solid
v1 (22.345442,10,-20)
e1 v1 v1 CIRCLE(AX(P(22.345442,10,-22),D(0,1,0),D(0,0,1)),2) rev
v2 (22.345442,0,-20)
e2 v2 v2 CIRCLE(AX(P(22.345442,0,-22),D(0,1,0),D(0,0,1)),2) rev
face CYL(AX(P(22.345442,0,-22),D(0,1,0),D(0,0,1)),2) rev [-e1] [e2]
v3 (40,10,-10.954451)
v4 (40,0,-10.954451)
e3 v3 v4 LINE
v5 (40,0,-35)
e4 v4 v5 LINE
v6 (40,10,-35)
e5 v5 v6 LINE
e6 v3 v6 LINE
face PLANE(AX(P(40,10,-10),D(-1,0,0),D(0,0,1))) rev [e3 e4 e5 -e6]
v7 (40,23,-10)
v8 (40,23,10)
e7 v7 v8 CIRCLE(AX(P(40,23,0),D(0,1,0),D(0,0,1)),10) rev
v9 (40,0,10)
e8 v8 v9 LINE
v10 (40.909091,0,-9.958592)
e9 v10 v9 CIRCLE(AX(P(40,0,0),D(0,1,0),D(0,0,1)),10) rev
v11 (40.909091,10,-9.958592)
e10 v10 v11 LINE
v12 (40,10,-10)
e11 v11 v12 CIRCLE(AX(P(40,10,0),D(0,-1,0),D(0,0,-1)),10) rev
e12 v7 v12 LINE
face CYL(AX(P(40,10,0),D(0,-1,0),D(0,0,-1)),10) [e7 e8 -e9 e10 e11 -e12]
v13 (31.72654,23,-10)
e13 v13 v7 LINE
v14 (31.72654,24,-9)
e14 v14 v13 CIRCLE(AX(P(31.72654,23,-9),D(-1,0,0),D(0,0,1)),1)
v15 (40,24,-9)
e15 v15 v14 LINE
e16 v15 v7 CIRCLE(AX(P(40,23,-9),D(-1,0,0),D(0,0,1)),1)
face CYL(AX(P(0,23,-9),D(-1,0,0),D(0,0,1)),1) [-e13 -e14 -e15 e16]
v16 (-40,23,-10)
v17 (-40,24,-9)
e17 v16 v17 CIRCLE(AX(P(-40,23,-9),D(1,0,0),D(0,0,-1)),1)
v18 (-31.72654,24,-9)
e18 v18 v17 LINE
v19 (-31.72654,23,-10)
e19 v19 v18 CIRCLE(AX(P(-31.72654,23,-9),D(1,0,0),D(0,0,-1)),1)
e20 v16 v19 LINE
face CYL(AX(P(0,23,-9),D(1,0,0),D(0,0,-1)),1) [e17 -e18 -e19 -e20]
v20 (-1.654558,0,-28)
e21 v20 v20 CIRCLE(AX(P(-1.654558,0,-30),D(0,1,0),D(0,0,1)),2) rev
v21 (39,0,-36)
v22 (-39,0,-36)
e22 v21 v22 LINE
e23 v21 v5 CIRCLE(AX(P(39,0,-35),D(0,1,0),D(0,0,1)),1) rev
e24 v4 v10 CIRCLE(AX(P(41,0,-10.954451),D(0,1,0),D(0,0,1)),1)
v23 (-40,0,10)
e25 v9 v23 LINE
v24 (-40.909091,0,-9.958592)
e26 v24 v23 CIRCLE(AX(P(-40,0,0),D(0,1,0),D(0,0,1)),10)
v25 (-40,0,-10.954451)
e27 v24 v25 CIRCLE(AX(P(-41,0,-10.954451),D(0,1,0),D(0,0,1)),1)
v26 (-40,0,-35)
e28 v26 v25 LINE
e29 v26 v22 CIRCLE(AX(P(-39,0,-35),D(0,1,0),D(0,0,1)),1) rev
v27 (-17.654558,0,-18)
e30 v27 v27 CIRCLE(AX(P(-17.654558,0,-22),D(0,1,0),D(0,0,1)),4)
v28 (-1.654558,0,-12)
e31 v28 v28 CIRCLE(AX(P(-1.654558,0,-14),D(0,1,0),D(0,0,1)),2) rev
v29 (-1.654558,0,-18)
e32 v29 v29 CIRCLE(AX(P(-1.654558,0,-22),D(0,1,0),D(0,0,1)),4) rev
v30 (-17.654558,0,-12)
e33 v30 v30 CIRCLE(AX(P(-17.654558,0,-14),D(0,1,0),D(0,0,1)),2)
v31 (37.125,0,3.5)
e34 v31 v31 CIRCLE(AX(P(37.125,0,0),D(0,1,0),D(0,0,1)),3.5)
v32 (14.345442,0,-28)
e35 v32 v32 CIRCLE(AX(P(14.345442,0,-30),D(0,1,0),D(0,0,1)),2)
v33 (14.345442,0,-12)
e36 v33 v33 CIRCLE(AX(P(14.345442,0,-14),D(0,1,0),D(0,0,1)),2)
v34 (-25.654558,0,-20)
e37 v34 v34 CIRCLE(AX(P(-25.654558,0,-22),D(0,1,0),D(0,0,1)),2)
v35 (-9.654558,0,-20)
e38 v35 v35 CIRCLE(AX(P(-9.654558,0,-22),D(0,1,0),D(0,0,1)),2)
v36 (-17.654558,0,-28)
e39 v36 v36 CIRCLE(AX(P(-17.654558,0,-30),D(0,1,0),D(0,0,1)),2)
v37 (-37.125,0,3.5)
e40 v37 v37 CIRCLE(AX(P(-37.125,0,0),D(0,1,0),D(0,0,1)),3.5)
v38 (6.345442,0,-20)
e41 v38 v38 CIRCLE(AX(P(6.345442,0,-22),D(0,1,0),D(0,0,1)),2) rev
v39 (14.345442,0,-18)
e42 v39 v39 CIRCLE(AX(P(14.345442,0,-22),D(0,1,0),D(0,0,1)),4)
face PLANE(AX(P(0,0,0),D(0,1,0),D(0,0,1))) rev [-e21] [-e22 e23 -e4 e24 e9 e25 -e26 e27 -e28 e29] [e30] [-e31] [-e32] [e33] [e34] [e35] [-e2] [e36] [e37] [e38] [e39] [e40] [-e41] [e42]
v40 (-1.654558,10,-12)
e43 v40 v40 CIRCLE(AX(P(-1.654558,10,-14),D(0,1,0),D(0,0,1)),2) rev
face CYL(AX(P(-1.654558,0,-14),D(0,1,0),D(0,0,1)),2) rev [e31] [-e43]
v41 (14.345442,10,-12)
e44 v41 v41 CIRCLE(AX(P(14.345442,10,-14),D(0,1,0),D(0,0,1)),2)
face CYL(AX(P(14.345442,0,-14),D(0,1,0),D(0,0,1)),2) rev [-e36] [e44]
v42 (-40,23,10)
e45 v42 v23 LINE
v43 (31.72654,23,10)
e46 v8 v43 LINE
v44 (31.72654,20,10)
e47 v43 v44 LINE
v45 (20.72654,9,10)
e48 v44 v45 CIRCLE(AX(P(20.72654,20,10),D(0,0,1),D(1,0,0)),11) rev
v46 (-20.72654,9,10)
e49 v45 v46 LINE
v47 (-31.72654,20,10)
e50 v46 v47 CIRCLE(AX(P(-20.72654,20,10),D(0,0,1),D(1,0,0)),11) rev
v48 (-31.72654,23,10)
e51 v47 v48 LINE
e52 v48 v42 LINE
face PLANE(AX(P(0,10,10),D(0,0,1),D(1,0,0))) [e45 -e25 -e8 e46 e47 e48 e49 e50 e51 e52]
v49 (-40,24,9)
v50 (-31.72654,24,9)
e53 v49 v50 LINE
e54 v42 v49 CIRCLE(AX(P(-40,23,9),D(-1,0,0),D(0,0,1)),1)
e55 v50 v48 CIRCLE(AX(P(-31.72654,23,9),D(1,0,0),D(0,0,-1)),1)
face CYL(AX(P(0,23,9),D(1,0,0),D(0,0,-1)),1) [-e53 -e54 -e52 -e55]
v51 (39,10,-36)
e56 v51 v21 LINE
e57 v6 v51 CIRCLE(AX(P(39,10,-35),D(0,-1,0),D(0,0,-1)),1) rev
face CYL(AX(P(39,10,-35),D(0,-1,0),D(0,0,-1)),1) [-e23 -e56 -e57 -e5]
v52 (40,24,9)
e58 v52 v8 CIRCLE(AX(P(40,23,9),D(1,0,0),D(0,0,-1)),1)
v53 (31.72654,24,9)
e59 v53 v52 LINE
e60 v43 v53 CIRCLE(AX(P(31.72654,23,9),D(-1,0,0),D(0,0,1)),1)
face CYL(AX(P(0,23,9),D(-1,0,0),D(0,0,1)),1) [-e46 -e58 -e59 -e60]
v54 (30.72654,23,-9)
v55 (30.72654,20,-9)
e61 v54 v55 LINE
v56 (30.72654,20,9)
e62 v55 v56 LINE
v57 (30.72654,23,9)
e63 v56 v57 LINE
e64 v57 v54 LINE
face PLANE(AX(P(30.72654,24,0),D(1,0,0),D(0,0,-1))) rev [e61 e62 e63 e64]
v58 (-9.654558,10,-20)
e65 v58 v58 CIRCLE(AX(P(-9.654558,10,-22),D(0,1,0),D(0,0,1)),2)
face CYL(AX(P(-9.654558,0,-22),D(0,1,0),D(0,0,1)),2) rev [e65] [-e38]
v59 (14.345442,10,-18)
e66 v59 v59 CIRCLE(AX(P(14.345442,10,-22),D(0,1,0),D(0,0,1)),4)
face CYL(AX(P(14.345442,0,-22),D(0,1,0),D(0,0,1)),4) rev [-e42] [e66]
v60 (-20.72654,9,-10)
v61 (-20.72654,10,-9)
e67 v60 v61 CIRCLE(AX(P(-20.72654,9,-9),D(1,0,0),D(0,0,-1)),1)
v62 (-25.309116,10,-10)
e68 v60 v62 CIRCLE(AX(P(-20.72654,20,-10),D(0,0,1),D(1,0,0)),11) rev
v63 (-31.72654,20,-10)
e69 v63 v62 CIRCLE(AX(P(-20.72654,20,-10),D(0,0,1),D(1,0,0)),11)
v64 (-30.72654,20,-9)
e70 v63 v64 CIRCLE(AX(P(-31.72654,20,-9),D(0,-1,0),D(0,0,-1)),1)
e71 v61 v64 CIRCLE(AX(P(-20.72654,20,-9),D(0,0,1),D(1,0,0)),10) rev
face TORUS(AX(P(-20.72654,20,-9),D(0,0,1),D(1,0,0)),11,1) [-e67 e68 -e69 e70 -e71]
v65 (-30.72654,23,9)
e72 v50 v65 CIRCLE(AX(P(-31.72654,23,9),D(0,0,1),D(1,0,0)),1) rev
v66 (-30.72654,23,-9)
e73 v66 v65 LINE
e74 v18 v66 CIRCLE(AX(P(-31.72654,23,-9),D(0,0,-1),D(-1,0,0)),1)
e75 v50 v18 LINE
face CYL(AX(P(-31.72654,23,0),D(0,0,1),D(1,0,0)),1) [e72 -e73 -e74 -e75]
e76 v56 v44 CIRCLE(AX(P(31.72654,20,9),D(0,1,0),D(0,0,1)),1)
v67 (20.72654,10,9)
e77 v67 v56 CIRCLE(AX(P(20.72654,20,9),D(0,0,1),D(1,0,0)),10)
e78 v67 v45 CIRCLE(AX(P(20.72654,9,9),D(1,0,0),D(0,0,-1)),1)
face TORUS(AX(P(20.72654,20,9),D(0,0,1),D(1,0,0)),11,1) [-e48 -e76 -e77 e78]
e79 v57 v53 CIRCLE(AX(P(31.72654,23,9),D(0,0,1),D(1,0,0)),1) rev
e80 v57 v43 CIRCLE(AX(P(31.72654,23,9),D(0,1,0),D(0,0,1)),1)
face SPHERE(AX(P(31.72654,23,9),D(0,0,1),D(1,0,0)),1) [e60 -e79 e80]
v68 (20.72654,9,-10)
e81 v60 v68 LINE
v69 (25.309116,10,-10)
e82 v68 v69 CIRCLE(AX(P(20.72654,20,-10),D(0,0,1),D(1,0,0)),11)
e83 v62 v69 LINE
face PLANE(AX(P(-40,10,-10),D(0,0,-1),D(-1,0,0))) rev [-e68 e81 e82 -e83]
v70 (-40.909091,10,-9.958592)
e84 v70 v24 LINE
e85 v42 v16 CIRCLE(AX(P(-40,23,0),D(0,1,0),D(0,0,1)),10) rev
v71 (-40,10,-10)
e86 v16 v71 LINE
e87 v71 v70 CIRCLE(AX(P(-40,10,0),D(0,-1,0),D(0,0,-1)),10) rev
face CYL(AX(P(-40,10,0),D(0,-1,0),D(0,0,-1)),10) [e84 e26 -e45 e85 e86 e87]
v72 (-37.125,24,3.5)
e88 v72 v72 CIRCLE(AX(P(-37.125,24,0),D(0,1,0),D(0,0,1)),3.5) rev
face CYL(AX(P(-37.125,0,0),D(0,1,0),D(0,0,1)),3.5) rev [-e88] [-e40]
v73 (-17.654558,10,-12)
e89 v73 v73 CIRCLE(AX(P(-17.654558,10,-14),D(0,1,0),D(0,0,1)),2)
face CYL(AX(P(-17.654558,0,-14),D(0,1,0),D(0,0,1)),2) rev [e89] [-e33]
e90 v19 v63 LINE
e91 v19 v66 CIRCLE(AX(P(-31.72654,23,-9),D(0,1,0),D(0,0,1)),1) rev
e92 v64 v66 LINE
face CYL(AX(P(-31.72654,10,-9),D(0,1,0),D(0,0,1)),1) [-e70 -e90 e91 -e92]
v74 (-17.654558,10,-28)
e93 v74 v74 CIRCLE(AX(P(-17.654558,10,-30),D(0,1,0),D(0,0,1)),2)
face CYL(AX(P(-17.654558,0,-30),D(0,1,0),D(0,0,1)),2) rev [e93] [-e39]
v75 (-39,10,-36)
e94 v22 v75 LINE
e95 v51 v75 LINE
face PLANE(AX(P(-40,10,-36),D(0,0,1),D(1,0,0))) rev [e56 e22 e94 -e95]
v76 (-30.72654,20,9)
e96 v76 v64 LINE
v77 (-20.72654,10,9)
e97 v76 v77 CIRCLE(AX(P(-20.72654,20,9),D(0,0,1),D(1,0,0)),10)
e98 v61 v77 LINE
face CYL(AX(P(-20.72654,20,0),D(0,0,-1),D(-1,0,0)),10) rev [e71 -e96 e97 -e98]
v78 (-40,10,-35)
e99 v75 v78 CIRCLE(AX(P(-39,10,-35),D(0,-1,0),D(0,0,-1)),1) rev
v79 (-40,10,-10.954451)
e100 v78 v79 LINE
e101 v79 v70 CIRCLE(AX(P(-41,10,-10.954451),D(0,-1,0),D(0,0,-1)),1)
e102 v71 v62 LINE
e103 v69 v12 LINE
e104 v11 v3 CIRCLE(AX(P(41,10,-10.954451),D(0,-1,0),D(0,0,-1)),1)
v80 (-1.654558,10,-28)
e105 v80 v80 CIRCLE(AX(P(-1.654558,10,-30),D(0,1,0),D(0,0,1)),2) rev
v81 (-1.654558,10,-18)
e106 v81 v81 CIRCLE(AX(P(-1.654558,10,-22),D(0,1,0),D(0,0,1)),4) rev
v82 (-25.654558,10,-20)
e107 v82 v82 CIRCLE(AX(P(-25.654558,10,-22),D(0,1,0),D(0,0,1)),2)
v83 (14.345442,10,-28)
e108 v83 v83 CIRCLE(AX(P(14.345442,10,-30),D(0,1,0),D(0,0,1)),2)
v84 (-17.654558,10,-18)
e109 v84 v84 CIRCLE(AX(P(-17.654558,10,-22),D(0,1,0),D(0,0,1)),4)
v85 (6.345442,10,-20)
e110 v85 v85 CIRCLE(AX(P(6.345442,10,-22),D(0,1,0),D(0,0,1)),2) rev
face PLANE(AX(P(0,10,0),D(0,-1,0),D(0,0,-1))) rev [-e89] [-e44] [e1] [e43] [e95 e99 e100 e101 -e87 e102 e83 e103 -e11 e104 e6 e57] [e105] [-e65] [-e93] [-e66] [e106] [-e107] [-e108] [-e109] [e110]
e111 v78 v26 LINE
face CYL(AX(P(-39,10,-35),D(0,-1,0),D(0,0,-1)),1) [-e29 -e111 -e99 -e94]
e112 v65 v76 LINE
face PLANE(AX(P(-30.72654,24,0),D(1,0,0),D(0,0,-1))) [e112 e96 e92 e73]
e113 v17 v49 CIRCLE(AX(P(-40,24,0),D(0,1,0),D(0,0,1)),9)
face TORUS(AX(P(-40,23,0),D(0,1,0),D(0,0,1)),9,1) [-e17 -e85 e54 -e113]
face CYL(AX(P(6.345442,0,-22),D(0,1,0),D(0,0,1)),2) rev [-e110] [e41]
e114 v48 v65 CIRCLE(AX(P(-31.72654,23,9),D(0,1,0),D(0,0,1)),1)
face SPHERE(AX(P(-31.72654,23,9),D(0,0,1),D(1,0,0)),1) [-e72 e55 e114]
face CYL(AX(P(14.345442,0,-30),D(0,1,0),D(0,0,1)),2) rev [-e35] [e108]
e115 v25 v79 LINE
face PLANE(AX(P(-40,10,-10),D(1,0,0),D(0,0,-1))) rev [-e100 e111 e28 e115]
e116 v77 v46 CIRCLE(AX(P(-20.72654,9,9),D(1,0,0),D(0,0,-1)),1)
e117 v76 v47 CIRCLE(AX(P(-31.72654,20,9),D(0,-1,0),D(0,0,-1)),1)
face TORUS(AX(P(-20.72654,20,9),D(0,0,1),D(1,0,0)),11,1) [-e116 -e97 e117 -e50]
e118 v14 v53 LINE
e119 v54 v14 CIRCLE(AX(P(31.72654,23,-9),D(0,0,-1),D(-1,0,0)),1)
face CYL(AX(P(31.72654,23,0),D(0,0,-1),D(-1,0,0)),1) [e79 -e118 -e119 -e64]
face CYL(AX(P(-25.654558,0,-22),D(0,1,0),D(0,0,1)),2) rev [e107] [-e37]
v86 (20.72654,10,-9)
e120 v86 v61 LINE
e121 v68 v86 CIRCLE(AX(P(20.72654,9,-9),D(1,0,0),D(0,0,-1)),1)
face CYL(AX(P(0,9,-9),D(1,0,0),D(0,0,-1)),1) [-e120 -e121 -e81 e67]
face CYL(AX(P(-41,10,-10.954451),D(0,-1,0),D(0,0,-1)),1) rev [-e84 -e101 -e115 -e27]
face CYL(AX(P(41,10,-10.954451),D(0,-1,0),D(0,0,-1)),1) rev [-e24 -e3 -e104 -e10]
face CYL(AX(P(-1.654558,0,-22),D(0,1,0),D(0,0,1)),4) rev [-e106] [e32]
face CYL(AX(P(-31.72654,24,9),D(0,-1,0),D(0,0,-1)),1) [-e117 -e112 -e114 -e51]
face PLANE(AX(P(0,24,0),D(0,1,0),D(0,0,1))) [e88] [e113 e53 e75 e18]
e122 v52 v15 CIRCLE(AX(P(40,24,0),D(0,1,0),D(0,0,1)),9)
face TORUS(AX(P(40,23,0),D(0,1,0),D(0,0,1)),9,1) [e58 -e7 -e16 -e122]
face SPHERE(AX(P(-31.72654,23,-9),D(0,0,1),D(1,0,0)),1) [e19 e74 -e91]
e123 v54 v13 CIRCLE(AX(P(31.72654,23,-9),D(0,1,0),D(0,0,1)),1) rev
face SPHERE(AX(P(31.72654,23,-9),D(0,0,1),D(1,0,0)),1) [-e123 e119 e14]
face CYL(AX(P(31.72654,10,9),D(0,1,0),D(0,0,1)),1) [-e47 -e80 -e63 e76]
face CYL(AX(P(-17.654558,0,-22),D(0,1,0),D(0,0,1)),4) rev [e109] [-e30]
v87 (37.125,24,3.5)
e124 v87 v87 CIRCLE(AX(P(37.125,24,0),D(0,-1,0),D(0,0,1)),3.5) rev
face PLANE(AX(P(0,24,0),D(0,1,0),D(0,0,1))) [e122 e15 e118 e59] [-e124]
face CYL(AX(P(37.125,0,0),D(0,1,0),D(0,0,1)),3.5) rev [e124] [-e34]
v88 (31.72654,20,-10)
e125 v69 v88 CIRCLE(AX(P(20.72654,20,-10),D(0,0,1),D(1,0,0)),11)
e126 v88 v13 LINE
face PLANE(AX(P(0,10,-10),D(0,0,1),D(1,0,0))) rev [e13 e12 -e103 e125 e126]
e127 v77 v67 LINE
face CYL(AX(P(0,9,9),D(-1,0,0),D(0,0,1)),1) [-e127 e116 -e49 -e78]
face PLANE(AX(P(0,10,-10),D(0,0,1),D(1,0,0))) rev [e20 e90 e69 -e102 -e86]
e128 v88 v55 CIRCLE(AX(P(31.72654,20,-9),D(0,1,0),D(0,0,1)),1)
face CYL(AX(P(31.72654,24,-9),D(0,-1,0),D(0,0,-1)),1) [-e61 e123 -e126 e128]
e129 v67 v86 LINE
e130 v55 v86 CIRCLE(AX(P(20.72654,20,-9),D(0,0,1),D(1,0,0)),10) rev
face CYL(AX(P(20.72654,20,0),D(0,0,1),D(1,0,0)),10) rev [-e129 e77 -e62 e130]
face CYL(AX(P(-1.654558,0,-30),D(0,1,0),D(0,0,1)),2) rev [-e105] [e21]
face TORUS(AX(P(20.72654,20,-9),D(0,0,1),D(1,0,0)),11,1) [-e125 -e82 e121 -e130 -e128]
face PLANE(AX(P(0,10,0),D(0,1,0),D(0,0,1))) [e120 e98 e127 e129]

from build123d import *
from build123d.topology import SkipClean

# Parameters (mm, degrees)
SKETCH1_W           = 80
SKETCH1_H           = 20
BOSS_EXTRUDE1_DEPTH = 10
SKETCH2_R           = 3.5
CUT_EXTRUDE1_DEPTH  = 10
SKETCH3_R           = 3.5
BOSS_EXTRUDE2_DEPTH = 14
FILLET1_R           = 10
FILLET2_R           = 1
SKETCH4_W           = 80
SKETCH4_H           = 26
BOSS_EXTRUDE3_DEPTH = 10
FILLET6_R           = 1
SKETCH5_R           = 2
SKETCH5_R_2         = 4
CUT_EXTRUDE2_DEPTH  = 10


with BuildPart() as part:
    # Sketch1 → Boss-Extrude1 (new body)
    with BuildSketch(Plane(origin=(0, 0, 0), x_dir=(1, 0, 0), z_dir=(0, 1, 0))):
        Rectangle(SKETCH1_W, SKETCH1_H)
        with BuildLine():
            Line((-40, -10), (-40, 10))
            ThreePointArc((-40, 10), (-50, 0), (-40, -10))
        make_face()
        with BuildLine():
            ThreePointArc((40, 10), (50, 0), (40, -10))
            Line((40, -10), (40, 10))
        make_face()
    extrude(amount=BOSS_EXTRUDE1_DEPTH)

    # Sketch2 → Cut-Extrude1 (cut)
    with BuildSketch(Plane(origin=(0, 10, 0), x_dir=(1, 0, 0), z_dir=(0, 1, 0))):
        with Locations(Location((-37.125, 0, 0), (0, 0, 270))):
            Circle(SKETCH2_R)
        with Locations(Location((37.125, 0, 0), (0, 0, 270))):
            Circle(SKETCH2_R)
    extrude(amount=-CUT_EXTRUDE1_DEPTH, mode=Mode.SUBTRACT)

    # Sketch3 → Boss-Extrude2 (add)
    with SkipClean():  # the faces are left unmerged after this step: merging them gives an invalid solid
        with BuildSketch(Plane(origin=(0, 10, 0), x_dir=(1, 0, 0), z_dir=(0, 1, 0))):
            with BuildLine():
                Line((-30.726539984, 10), (-40, 10))
                ThreePointArc((-40, 10), (-50, 0), (-40, -10))
                Line((-40, -10), (-30.726539984, -10))
                Line((-30.726539984, -10), (-30.726539984, 10))
            make_face()
            with Locations((-37.125, 0)):
                Circle(SKETCH3_R, mode=Mode.SUBTRACT)
        boss_extrude2 = extrude(amount=BOSS_EXTRUDE2_DEPTH)
    add(part.part.scale(1), mode=Mode.REPLACE)  # the faces are merged on a copy

    # Mirror1: Boss-Extrude2 across plane
    with SkipClean():  # the faces are left unmerged after this step: merging them gives an invalid solid
        add(boss_extrude2.mirror(Plane(origin=(0, 0, 0), x_dir=(0, 0, 1), z_dir=(1, 0, 0))))

    # Fillet1
    fillet1_edges = [part.edges().sort_by_distance(p)[0] for p in [
        (30.726539984, 10, 0),
        (-30.726539984, 10, 0),
    ]]
    fillet(fillet1_edges, radius=FILLET1_R)

    # Fillet2
    fillet2_edges = [part.edges().sort_by_distance(p)[0] for p in [
        (-30.726539984, 22, -10),
        (-30.726539984, 24, 0),
        (-30.726539984, 22, 10),
        (-35.363269992, 24, -10),
        (-50, 24, 0),
        (-35.363269992, 24, 10),
        (35.363269992, 24, -10),
        (30.726539984, 22, -10),
        (35.363269992, 24, 10),
        (30.726539984, 22, 10),
        (50, 24, 0),
        (30.726539984, 24, 0),
        (0, 10, 10),
        (0, 10, -10),
        (27.797607796, 12.928932188, 10),
        (27.797607796, 12.928932188, -10),
        (-27.797607796, 12.928932188, 10),
        (-27.797607796, 12.928932188, -10),
    ]]
    fillet(fillet2_edges, radius=FILLET2_R)

    # Sketch4 → Boss-Extrude3 (add)
    with SkipClean():  # the faces are left unmerged after this step: merging them gives an invalid solid
        with BuildSketch(Plane(origin=(0, 0, 0), x_dir=(1, 0, 0), z_dir=(0, 1, 0))):
            with Locations((0, 23)):
                Rectangle(SKETCH4_W, SKETCH4_H)
        extrude(amount=BOSS_EXTRUDE3_DEPTH)

    # Fillet6
    # the kernel refuses this fillet: 1 mm, written as the material it adds along each edge
    with BuildSketch(Plane(origin=(-40, 10, -10), x_dir=(-0.9989642624898896, -1.4787641666586187e-15, 0.04550167324429737), z_dir=(0, -1, 0)), Plane(origin=(40, 0, -10), x_dir=(0.9989642624898897, 0, 0.04550167324429667), z_dir=(0, 1, 0))) as fillet6_piece_1:
        with BuildLine():
            CenterArc((0.955535138, 0.998964262), FILLET6_R, 182.607954285, 84.78409143)
            Line((-0.043429124, 0.953462589), (0, 0))
            ThreePointArc((0, 0), (0.455016732, 0.010357375), (0.910033465, 0))
        make_face()
    extrude(amount=10)
    # the kernel refuses this fillet: 1 mm, written as the material it takes off along each edge
    with BuildSketch(Plane(origin=(-40, -2.5, -36), x_dir=(0, 0, 1), z_dir=(0, 1, 0))) as fillet6_2_piece_1:
        with BuildLine():
            CenterArc((FILLET6_R, FILLET6_R), FILLET6_R, 180, 90)
            Line((0, FILLET6_R), (0, 0))
            Line((0, 0), (FILLET6_R, 0))
        make_face()
    extrude(amount=15, mode=Mode.SUBTRACT)
    with BuildSketch(Plane(origin=(40, -2.5, -36), x_dir=(0, 0, 1), z_dir=(0, 1, 0))) as fillet6_2_piece_2:
        with BuildLine():
            CenterArc((FILLET6_R, -FILLET6_R), FILLET6_R, 90, 90)
            Line((0, -FILLET6_R), (0, 0))
            Line((0, 0), (FILLET6_R, 0))
        make_face()
    extrude(amount=15, mode=Mode.SUBTRACT)

    # Sketch5 → Cut-Extrude2 (cut)
    with BuildSketch(Plane(origin=(0, 10, 0), x_dir=(1, 0, 0), z_dir=(0, 1, 0))):
        with Locations(Location((-9.65455784, 22, 0), (0, 0, 270))):
            Circle(SKETCH5_R)
        with Locations(Location((-17.65455784, 22, 0), (0, 0, 270))):
            Circle(SKETCH5_R_2)
        with Locations(Location((-17.65455784, 14, 0), (0, 0, 270))):
            Circle(SKETCH5_R)
        with Locations(Location((-25.65455784, 22, 0), (0, 0, 270))):
            Circle(SKETCH5_R)
        with Locations(Location((-17.65455784, 30, 0), (0, 0, 270))):
            Circle(SKETCH5_R)
        with Locations(Location((-1.65455784, 30, 0), (0, 0, 270))):
            Circle(SKETCH5_R)
        with Locations(Location((6.34544216, 22, 0), (0, 0, 270))):
            Circle(SKETCH5_R)
        with Locations(Location((-1.65455784, 14, 0), (0, 0, 270))):
            Circle(SKETCH5_R)
        with Locations(Location((-1.65455784, 22, 0), (0, 0, 270))):
            Circle(SKETCH5_R_2)
        with Locations(Location((22.34544216, 22, 0), (0, 0, 270))):
            Circle(SKETCH5_R)
        with Locations(Location((14.34544216, 14, 0), (0, 0, 270))):
            Circle(SKETCH5_R)
        with Locations(Location((14.34544216, 30, 0), (0, 0, 270))):
            Circle(SKETCH5_R)
        with Locations(Location((14.34544216, 22, 0), (0, 0, 270))):
            Circle(SKETCH5_R_2)
    extrude(amount=-CUT_EXTRUDE2_DEPTH, mode=Mode.SUBTRACT)


solid = part.part
